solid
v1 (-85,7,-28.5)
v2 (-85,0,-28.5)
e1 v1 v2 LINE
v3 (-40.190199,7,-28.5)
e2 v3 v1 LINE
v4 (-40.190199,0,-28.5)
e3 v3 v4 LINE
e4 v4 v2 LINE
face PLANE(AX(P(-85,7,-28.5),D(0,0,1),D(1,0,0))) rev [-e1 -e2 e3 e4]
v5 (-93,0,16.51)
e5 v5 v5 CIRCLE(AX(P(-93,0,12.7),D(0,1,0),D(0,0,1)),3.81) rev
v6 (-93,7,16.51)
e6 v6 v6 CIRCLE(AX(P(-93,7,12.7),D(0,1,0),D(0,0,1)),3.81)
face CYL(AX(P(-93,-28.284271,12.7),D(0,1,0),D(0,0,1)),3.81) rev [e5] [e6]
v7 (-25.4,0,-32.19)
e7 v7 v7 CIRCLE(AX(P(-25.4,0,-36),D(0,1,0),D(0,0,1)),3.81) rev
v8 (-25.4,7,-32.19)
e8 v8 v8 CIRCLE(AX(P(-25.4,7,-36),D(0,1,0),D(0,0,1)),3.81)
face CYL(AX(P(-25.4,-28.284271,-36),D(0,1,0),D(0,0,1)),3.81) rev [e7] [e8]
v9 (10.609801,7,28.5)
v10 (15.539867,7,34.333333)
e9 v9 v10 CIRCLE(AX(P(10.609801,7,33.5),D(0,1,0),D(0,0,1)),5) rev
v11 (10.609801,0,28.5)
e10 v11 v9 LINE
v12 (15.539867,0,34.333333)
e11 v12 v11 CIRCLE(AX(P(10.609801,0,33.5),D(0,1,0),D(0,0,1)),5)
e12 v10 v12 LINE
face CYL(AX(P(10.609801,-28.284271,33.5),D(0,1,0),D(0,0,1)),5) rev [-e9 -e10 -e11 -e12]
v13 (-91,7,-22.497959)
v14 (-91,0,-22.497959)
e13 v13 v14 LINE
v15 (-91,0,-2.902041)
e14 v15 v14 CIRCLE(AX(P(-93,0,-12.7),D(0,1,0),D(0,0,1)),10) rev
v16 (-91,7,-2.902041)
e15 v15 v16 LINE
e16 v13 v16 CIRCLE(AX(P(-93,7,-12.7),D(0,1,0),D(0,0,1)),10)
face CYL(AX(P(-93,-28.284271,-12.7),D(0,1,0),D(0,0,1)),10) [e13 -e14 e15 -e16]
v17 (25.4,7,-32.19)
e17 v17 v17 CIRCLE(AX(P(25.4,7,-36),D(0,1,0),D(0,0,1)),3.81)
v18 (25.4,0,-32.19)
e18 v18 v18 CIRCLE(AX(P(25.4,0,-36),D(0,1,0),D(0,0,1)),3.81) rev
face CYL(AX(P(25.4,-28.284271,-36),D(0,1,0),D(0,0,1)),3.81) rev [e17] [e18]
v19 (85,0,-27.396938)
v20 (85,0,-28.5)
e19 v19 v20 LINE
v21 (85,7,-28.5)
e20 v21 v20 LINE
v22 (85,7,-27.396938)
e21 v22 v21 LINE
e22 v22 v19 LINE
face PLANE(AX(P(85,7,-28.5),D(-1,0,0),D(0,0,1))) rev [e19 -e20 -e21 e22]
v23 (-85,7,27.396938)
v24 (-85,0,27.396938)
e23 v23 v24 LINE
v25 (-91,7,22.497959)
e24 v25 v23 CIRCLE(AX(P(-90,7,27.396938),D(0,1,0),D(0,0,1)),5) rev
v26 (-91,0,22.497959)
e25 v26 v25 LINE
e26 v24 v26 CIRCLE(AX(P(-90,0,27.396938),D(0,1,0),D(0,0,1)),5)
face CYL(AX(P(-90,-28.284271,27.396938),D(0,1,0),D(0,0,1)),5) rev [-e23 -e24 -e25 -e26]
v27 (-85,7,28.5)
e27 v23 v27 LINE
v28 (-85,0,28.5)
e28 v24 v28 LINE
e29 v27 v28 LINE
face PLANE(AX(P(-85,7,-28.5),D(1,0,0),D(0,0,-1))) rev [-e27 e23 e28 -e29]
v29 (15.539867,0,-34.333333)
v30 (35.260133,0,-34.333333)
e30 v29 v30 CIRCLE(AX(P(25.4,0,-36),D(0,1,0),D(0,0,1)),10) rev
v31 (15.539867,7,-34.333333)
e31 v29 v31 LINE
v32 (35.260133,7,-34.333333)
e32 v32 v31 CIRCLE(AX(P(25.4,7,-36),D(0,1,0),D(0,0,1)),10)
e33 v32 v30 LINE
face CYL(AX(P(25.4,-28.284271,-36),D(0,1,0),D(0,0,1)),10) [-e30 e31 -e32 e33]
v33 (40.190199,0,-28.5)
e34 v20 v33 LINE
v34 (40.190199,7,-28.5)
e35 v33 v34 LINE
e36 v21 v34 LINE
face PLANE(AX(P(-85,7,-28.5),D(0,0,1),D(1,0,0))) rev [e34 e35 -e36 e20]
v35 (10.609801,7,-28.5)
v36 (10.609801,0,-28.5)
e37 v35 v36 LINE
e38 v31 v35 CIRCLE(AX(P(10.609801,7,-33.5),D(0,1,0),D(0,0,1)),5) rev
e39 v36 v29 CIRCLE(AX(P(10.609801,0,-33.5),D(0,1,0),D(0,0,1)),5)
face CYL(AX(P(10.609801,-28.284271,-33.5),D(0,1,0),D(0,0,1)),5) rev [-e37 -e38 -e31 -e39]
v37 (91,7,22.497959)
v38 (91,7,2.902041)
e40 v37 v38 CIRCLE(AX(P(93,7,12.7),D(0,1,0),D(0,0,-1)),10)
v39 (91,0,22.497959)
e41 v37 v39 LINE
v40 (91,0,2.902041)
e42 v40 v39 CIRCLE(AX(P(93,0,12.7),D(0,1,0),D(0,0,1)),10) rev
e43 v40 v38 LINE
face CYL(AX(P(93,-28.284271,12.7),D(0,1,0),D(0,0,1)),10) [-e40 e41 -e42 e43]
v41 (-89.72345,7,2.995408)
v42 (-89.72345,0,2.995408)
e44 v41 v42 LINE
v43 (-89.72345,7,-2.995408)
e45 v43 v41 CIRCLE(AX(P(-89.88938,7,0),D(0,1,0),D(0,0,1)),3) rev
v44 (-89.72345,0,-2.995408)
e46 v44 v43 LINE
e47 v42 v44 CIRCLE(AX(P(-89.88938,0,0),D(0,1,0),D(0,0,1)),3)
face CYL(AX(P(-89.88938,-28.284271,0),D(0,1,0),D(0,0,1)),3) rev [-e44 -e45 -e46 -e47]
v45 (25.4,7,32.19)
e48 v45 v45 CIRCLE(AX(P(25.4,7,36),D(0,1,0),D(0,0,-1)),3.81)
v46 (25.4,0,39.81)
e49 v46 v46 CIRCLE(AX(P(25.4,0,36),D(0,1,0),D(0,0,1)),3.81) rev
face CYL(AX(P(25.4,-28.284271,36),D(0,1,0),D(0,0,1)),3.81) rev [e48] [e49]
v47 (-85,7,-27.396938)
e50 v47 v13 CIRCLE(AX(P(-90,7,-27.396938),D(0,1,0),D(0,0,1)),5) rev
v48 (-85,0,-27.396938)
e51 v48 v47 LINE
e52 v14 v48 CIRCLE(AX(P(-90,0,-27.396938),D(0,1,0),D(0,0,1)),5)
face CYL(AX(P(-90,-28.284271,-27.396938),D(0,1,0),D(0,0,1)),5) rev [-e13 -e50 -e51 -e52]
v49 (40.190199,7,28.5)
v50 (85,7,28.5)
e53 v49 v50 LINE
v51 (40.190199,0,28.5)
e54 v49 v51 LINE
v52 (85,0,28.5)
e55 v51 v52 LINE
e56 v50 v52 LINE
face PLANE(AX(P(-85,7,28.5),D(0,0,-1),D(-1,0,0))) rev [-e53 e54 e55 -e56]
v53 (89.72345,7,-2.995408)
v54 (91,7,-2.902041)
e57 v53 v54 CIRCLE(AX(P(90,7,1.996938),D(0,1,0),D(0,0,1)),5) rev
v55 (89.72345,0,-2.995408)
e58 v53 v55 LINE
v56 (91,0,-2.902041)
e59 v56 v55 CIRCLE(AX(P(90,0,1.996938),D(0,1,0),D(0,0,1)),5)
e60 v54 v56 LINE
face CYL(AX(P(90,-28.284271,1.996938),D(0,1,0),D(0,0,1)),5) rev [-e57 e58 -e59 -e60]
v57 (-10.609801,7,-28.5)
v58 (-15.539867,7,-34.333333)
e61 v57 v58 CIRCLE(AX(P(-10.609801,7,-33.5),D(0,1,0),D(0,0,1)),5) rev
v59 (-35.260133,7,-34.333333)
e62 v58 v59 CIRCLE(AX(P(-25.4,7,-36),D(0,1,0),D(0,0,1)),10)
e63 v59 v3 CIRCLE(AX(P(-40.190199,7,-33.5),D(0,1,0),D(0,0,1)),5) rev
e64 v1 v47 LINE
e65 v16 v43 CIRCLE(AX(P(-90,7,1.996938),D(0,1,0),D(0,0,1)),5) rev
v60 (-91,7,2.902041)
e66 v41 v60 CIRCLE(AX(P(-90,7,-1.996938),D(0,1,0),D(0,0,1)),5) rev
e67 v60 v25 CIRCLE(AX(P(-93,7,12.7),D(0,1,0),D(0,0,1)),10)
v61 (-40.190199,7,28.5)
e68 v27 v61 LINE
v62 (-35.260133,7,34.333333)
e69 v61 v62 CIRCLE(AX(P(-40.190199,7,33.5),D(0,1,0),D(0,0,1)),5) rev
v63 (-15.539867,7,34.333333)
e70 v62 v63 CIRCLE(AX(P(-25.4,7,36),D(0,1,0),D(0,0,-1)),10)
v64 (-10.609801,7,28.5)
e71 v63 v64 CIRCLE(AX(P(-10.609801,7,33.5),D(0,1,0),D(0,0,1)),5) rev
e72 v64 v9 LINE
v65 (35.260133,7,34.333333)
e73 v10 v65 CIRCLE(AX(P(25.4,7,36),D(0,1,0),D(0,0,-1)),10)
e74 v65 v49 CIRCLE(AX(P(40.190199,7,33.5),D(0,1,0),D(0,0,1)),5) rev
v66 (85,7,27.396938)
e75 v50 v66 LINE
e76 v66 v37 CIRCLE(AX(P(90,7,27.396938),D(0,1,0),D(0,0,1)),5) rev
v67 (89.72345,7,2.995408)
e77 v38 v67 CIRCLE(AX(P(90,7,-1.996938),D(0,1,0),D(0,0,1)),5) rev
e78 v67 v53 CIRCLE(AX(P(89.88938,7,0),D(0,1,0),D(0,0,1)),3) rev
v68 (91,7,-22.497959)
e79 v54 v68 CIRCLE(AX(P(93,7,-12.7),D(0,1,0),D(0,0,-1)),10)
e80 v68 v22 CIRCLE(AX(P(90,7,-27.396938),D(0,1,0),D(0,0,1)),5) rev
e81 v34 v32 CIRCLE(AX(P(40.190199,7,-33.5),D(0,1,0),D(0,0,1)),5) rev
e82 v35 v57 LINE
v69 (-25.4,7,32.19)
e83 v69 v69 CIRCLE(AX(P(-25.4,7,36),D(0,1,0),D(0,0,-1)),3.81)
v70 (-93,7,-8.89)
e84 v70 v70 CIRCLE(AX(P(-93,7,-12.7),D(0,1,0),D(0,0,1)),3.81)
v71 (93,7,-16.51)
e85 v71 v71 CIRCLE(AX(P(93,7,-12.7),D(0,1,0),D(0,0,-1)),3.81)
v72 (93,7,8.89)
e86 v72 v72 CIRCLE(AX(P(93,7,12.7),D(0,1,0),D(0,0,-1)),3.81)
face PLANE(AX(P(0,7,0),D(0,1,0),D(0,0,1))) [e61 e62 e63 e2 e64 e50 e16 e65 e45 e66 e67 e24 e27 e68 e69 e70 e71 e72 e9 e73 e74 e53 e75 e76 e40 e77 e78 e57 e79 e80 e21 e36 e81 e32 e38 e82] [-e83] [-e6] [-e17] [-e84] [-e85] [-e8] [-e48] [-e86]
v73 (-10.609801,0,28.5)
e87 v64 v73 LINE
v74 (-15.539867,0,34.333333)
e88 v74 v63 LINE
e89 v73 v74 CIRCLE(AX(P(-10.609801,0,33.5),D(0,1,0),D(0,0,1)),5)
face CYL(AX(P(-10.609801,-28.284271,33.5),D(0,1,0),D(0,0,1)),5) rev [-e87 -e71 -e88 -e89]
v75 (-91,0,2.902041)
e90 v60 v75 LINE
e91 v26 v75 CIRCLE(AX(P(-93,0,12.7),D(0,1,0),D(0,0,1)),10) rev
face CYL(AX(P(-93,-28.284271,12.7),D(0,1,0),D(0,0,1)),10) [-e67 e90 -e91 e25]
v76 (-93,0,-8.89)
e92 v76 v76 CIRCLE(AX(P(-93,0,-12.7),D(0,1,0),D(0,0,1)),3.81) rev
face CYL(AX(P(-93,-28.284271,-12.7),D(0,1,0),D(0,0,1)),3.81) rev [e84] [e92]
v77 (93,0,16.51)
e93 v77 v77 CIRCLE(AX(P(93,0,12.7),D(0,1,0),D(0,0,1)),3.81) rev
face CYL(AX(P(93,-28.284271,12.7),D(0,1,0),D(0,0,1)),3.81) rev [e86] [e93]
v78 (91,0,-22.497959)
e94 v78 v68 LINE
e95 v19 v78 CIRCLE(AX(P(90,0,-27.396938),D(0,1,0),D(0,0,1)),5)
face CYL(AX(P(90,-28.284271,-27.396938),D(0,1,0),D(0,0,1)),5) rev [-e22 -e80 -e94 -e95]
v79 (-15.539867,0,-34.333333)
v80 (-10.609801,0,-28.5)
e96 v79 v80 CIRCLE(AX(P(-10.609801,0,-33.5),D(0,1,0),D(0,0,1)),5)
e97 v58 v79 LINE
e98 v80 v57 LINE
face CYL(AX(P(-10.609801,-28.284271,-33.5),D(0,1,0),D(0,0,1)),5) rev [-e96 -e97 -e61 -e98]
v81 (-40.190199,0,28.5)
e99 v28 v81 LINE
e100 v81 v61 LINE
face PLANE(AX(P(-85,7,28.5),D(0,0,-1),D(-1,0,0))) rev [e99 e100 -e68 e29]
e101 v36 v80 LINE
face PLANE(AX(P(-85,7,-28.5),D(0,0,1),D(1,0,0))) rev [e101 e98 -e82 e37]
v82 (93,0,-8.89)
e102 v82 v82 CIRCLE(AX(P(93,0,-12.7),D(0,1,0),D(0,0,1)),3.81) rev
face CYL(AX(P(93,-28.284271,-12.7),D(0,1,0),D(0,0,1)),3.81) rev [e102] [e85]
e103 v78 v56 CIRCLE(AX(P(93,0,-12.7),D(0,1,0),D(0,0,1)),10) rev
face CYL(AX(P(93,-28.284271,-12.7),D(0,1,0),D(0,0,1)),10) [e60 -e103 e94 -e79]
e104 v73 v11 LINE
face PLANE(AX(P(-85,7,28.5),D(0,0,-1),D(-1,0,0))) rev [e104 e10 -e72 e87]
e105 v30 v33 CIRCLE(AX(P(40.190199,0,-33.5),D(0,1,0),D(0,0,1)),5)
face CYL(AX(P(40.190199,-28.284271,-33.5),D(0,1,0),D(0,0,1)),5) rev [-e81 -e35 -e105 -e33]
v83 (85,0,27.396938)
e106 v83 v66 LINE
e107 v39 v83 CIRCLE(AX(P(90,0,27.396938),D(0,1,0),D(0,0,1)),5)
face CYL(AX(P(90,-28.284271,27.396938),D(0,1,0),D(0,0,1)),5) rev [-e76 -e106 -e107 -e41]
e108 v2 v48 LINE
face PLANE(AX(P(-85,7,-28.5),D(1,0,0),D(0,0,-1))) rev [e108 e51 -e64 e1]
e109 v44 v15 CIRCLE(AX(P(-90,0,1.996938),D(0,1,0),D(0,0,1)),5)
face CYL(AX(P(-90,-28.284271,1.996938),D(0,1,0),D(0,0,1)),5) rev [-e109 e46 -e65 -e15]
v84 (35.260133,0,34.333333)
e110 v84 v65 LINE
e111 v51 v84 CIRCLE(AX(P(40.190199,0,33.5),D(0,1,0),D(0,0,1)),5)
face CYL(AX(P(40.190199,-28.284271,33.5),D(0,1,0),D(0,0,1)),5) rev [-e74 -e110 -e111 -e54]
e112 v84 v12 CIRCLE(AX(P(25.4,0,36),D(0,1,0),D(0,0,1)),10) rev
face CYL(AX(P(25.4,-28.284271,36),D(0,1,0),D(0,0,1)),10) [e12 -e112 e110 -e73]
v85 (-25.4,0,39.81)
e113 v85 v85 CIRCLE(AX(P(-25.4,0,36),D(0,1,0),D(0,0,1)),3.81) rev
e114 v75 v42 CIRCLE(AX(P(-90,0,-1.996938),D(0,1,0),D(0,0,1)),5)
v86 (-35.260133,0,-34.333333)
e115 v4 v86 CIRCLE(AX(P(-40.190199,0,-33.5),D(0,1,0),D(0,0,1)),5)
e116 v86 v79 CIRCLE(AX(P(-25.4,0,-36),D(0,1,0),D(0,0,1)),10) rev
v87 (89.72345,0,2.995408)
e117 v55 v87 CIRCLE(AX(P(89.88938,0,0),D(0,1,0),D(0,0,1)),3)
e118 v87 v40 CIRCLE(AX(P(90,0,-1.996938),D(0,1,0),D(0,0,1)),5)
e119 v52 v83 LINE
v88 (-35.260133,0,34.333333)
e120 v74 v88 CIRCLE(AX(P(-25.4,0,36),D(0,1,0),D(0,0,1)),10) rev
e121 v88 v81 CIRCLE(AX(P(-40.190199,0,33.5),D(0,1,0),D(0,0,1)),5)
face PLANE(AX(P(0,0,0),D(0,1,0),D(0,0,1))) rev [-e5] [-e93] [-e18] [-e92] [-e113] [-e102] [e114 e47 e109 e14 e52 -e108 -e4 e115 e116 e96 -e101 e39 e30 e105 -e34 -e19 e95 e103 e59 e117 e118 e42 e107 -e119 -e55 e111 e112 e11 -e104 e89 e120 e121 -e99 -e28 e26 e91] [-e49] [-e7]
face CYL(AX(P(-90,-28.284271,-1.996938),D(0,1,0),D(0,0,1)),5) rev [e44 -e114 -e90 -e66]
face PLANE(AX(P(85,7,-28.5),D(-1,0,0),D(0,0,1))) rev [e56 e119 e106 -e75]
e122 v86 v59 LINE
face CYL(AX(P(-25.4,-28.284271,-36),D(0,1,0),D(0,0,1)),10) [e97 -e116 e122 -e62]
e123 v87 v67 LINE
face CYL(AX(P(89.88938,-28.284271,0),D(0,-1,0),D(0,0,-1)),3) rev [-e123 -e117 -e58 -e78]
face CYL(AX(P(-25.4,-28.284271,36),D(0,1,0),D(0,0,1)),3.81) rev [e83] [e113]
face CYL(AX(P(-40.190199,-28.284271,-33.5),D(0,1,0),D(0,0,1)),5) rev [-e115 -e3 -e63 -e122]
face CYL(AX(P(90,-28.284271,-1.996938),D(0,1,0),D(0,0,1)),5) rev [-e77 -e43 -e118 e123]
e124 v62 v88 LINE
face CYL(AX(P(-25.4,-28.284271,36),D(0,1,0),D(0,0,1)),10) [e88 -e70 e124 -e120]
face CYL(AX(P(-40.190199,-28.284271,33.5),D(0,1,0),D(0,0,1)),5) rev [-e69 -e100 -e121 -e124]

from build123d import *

# Parameters (mm, degrees)
SKETCH1_W           = 170
SKETCH1_H           = 57
BOSS_EXTRUDE1_DEPTH = 7
SKETCH2_R           = 10
SKETCH2_R_2         = 3.81
BOSS_EXTRUDE2_DEPTH = 7
FILLET1_R           = 5
FILLET2_R           = 3


with BuildPart() as part:
    # Sketch1 → Boss-Extrude1 (new body)
    with BuildSketch(Plane(origin=(0, 0, 0), x_dir=(1, 0, 0), z_dir=(0, 1, 0))):
        Rectangle(SKETCH1_W, SKETCH1_H)
    extrude(amount=BOSS_EXTRUDE1_DEPTH)

    # Sketch2 → Boss-Extrude2 (add)
    # profile 1 of 8: a face of its own
    with BuildSketch(Plane(origin=(0, 7, 0), x_dir=(1, 0, 0), z_dir=(0, 1, 0))):
        with Locations((-25.4, 36)):
            Circle(SKETCH2_R)
        with Locations(Location((-25.4, 36, 0), (0, 0, 270))):
            Circle(SKETCH2_R_2, mode=Mode.SUBTRACT)
    # profile 2 of 8: a face of its own
    with BuildSketch(Plane(origin=(0, 7, 0), x_dir=(1, 0, 0), z_dir=(0, 1, 0))):
        with Locations((25.4, 36)):
            Circle(SKETCH2_R)
        with Locations(Location((25.4, 36, 0), (0, 0, 270))):
            Circle(SKETCH2_R_2, mode=Mode.SUBTRACT)
    # profile 3 of 8: a face of its own
    with BuildSketch(Plane(origin=(0, 7, 0), x_dir=(1, 0, 0), z_dir=(0, 1, 0))):
        with Locations((-93, 12.7)):
            Circle(SKETCH2_R)
        with Locations(Location((-93, 12.7, 0), (0, 0, 270))):
            Circle(SKETCH2_R_2, mode=Mode.SUBTRACT)
    # profile 4 of 8: a face of its own
    with BuildSketch(Plane(origin=(0, 7, 0), x_dir=(1, 0, 0), z_dir=(0, 1, 0))):
        with Locations((-93, -12.7)):
            Circle(SKETCH2_R)
        with Locations(Location((-93, -12.7, 0), (0, 0, 270))):
            Circle(SKETCH2_R_2, mode=Mode.SUBTRACT)
    # profile 5 of 8: a face of its own
    with BuildSketch(Plane(origin=(0, 7, 0), x_dir=(1, 0, 0), z_dir=(0, 1, 0))):
        with Locations((93, -12.7)):
            Circle(SKETCH2_R)
        with Locations(Location((93, -12.7, 0), (0, 0, 270))):
            Circle(SKETCH2_R_2, mode=Mode.SUBTRACT)
    # profile 6 of 8: a face of its own
    with BuildSketch(Plane(origin=(0, 7, 0), x_dir=(1, 0, 0), z_dir=(0, 1, 0))):
        with Locations((93, 12.7)):
            Circle(SKETCH2_R)
        with Locations(Location((93, 12.7, 0), (0, 0, 270))):
            Circle(SKETCH2_R_2, mode=Mode.SUBTRACT)
    # profile 7 of 8: a face of its own
    with BuildSketch(Plane(origin=(0, 7, 0), x_dir=(1, 0, 0), z_dir=(0, 1, 0))):
        with Locations((25.4, -36)):
            Circle(SKETCH2_R)
        with Locations(Location((25.4, -36, 0), (0, 0, 270))):
            Circle(SKETCH2_R_2, mode=Mode.SUBTRACT)
    # profile 8 of 8: a face of its own
    with BuildSketch(Plane(origin=(0, 7, 0), x_dir=(1, 0, 0), z_dir=(0, 1, 0))):
        with Locations((-25.4, -36)):
            Circle(SKETCH2_R)
        with Locations(Location((-25.4, -36, 0), (0, 0, 270))):
            Circle(SKETCH2_R_2, mode=Mode.SUBTRACT)
    extrude(amount=-BOSS_EXTRUDE2_DEPTH)

    # Fillet1
    # the kernel refuses this fillet: 5 mm, written as the material it adds along each edge
    with BuildSketch(Plane(origin=(-18.785621722, 0, -28.5), x_dir=(1, 0, 0), z_dir=(0, 1, 0)), Plane(origin=(32.014378278, 0, -28.5), x_dir=(1, 0, 0), z_dir=(0, 1, 0)), Plane(origin=(18.785621722, 0, 28.5), x_dir=(-1, 0, 0), z_dir=(0, 1, 0)), Plane(origin=(-32.014378278, 0, 28.5), x_dir=(-1, 0, 0), z_dir=(0, 1, 0))) as fillet1_piece_1:
        with BuildLine():
            CenterArc((8.17582118, 5), FILLET1_R, 170.405931773, 99.594068227)
            ThreePointArc((3.245754694, 5.833333333), (2.124003991, 2.63783224), (0, 0))
            Line((0, 0), (8.17582118, 0))
        make_face()
    extrude(amount=7)
    with BuildSketch(Plane(origin=(-32.014378278, 0, -28.5), x_dir=(-1, 0, 0), z_dir=(0, 1, 0))) as fillet1_piece_2:
        with BuildLine():
            CenterArc((8.17582118, -5), FILLET1_R, 90, 99.594068227)
            ThreePointArc((3.245754694, -5.833333333), (2.124003991, -2.63783224), (0, 0))
            Line((0, 0), (8.17582118, 0))
        make_face()
    extrude(amount=7)
    with BuildSketch(Plane(origin=(18.785621722, 0, -28.5), x_dir=(-0.4862167760179408, 0, -0.8738382268582209), z_dir=(0, 1, 0)), Plane(origin=(32.014378278, 0, 28.5), x_dir=(0.4862167760179433, 0, 0.8738382268582195), z_dir=(0, 1, 0)), Plane(origin=(-18.785621722, 0, 28.5), x_dir=(0.4862167760179409, 0, 0.8738382268582208), z_dir=(0, 1, 0))) as fillet1_piece_3:
        with BuildLine():
            CenterArc((8.34441255, 4.713261203), FILLET1_R, 150.907776941, 99.594068227)
            Line((3.975221415, 7.144345083), (0, 0))
            ThreePointArc((0, 0), (3.33776502, 0.573477594), (6.67553004, 0))
        make_face()
    extrude(amount=7)
    with BuildSketch(Plane(origin=(-85, 0, -18.7), x_dir=(0, 0, -1), z_dir=(0, 1, 0)), Plane(origin=(-85, 0, 6.7), x_dir=(0, 0, -1), z_dir=(0, 1, 0)), Plane(origin=(85, 0, 18.7), x_dir=(0, 0, 1), z_dir=(0, 1, 0)), Plane(origin=(85, 0, -6.7), x_dir=(0, 0, 1), z_dir=(0, 1, 0))) as fillet1_piece_4:
        with BuildLine():
            CenterArc((8.696938457, 5), FILLET1_R, 168.463040967, 101.536959033)
            ThreePointArc((3.797958971, 6), (2.449489743, 2.651530772), (0, 0))
            Line((0, 0), (8.696938457, 0))
        make_face()
    extrude(amount=7)
    with BuildSketch(Plane(origin=(-85, 0, -6.7), x_dir=(-0.8449489742783158, 0, 0.5348469228349566), z_dir=(0, 1, 0)), Plane(origin=(-85, 0, 18.7), x_dir=(-0.844948974278316, 0, 0.5348469228349564), z_dir=(0, 1, 0)), Plane(origin=(85, 0, 6.7), x_dir=(0.8449489742783187, 0, -0.5348469228349522), z_dir=(0, 1, 0)), Plane(origin=(85, 0, -18.7), x_dir=(0.8449489742783186, 0, -0.5348469228349523), z_dir=(0, 1, 0))) as fillet1_piece_5:
        with BuildLine():
            CenterArc((8.876275643, 4.674234614), FILLET1_R, 147.666469307, 101.536959033)
            Line((4.651530772, 7.348469228), (0, 0))
            ThreePointArc((0, 0), (3.550510257, 0.651530772), (7.101020514, 0))
        make_face()
    extrude(amount=7)

    # Fillet2
    # the kernel refuses this fillet: 3 mm, written as the material it adds along each edge
    with BuildSketch(Plane(origin=(-85.416089355, 7, 0), x_dir=(-0.8209960620456767, 0, 0.5709338544047737), z_dir=(0, -1, 0)), Plane(origin=(85.416089355, 7, 0), x_dir=(0.8209960620456767, 0, -0.5709338544047737), z_dir=(0, -1, 0))) as fillet2_piece_1:
        with BuildLine():
            CenterArc((3.672553945, 2.553953029), FILLET2_R, 127.986021581, 173.658700766)
            ThreePointArc((1.826146326, 4.918435827), (0.216147897, 2.717976503), (0, 0))
            ThreePointArc((0, 0), (2.623252818, -0.743411618), (5.246505636, 0))
        make_face()
    extrude(amount=7)


solid = part.part
